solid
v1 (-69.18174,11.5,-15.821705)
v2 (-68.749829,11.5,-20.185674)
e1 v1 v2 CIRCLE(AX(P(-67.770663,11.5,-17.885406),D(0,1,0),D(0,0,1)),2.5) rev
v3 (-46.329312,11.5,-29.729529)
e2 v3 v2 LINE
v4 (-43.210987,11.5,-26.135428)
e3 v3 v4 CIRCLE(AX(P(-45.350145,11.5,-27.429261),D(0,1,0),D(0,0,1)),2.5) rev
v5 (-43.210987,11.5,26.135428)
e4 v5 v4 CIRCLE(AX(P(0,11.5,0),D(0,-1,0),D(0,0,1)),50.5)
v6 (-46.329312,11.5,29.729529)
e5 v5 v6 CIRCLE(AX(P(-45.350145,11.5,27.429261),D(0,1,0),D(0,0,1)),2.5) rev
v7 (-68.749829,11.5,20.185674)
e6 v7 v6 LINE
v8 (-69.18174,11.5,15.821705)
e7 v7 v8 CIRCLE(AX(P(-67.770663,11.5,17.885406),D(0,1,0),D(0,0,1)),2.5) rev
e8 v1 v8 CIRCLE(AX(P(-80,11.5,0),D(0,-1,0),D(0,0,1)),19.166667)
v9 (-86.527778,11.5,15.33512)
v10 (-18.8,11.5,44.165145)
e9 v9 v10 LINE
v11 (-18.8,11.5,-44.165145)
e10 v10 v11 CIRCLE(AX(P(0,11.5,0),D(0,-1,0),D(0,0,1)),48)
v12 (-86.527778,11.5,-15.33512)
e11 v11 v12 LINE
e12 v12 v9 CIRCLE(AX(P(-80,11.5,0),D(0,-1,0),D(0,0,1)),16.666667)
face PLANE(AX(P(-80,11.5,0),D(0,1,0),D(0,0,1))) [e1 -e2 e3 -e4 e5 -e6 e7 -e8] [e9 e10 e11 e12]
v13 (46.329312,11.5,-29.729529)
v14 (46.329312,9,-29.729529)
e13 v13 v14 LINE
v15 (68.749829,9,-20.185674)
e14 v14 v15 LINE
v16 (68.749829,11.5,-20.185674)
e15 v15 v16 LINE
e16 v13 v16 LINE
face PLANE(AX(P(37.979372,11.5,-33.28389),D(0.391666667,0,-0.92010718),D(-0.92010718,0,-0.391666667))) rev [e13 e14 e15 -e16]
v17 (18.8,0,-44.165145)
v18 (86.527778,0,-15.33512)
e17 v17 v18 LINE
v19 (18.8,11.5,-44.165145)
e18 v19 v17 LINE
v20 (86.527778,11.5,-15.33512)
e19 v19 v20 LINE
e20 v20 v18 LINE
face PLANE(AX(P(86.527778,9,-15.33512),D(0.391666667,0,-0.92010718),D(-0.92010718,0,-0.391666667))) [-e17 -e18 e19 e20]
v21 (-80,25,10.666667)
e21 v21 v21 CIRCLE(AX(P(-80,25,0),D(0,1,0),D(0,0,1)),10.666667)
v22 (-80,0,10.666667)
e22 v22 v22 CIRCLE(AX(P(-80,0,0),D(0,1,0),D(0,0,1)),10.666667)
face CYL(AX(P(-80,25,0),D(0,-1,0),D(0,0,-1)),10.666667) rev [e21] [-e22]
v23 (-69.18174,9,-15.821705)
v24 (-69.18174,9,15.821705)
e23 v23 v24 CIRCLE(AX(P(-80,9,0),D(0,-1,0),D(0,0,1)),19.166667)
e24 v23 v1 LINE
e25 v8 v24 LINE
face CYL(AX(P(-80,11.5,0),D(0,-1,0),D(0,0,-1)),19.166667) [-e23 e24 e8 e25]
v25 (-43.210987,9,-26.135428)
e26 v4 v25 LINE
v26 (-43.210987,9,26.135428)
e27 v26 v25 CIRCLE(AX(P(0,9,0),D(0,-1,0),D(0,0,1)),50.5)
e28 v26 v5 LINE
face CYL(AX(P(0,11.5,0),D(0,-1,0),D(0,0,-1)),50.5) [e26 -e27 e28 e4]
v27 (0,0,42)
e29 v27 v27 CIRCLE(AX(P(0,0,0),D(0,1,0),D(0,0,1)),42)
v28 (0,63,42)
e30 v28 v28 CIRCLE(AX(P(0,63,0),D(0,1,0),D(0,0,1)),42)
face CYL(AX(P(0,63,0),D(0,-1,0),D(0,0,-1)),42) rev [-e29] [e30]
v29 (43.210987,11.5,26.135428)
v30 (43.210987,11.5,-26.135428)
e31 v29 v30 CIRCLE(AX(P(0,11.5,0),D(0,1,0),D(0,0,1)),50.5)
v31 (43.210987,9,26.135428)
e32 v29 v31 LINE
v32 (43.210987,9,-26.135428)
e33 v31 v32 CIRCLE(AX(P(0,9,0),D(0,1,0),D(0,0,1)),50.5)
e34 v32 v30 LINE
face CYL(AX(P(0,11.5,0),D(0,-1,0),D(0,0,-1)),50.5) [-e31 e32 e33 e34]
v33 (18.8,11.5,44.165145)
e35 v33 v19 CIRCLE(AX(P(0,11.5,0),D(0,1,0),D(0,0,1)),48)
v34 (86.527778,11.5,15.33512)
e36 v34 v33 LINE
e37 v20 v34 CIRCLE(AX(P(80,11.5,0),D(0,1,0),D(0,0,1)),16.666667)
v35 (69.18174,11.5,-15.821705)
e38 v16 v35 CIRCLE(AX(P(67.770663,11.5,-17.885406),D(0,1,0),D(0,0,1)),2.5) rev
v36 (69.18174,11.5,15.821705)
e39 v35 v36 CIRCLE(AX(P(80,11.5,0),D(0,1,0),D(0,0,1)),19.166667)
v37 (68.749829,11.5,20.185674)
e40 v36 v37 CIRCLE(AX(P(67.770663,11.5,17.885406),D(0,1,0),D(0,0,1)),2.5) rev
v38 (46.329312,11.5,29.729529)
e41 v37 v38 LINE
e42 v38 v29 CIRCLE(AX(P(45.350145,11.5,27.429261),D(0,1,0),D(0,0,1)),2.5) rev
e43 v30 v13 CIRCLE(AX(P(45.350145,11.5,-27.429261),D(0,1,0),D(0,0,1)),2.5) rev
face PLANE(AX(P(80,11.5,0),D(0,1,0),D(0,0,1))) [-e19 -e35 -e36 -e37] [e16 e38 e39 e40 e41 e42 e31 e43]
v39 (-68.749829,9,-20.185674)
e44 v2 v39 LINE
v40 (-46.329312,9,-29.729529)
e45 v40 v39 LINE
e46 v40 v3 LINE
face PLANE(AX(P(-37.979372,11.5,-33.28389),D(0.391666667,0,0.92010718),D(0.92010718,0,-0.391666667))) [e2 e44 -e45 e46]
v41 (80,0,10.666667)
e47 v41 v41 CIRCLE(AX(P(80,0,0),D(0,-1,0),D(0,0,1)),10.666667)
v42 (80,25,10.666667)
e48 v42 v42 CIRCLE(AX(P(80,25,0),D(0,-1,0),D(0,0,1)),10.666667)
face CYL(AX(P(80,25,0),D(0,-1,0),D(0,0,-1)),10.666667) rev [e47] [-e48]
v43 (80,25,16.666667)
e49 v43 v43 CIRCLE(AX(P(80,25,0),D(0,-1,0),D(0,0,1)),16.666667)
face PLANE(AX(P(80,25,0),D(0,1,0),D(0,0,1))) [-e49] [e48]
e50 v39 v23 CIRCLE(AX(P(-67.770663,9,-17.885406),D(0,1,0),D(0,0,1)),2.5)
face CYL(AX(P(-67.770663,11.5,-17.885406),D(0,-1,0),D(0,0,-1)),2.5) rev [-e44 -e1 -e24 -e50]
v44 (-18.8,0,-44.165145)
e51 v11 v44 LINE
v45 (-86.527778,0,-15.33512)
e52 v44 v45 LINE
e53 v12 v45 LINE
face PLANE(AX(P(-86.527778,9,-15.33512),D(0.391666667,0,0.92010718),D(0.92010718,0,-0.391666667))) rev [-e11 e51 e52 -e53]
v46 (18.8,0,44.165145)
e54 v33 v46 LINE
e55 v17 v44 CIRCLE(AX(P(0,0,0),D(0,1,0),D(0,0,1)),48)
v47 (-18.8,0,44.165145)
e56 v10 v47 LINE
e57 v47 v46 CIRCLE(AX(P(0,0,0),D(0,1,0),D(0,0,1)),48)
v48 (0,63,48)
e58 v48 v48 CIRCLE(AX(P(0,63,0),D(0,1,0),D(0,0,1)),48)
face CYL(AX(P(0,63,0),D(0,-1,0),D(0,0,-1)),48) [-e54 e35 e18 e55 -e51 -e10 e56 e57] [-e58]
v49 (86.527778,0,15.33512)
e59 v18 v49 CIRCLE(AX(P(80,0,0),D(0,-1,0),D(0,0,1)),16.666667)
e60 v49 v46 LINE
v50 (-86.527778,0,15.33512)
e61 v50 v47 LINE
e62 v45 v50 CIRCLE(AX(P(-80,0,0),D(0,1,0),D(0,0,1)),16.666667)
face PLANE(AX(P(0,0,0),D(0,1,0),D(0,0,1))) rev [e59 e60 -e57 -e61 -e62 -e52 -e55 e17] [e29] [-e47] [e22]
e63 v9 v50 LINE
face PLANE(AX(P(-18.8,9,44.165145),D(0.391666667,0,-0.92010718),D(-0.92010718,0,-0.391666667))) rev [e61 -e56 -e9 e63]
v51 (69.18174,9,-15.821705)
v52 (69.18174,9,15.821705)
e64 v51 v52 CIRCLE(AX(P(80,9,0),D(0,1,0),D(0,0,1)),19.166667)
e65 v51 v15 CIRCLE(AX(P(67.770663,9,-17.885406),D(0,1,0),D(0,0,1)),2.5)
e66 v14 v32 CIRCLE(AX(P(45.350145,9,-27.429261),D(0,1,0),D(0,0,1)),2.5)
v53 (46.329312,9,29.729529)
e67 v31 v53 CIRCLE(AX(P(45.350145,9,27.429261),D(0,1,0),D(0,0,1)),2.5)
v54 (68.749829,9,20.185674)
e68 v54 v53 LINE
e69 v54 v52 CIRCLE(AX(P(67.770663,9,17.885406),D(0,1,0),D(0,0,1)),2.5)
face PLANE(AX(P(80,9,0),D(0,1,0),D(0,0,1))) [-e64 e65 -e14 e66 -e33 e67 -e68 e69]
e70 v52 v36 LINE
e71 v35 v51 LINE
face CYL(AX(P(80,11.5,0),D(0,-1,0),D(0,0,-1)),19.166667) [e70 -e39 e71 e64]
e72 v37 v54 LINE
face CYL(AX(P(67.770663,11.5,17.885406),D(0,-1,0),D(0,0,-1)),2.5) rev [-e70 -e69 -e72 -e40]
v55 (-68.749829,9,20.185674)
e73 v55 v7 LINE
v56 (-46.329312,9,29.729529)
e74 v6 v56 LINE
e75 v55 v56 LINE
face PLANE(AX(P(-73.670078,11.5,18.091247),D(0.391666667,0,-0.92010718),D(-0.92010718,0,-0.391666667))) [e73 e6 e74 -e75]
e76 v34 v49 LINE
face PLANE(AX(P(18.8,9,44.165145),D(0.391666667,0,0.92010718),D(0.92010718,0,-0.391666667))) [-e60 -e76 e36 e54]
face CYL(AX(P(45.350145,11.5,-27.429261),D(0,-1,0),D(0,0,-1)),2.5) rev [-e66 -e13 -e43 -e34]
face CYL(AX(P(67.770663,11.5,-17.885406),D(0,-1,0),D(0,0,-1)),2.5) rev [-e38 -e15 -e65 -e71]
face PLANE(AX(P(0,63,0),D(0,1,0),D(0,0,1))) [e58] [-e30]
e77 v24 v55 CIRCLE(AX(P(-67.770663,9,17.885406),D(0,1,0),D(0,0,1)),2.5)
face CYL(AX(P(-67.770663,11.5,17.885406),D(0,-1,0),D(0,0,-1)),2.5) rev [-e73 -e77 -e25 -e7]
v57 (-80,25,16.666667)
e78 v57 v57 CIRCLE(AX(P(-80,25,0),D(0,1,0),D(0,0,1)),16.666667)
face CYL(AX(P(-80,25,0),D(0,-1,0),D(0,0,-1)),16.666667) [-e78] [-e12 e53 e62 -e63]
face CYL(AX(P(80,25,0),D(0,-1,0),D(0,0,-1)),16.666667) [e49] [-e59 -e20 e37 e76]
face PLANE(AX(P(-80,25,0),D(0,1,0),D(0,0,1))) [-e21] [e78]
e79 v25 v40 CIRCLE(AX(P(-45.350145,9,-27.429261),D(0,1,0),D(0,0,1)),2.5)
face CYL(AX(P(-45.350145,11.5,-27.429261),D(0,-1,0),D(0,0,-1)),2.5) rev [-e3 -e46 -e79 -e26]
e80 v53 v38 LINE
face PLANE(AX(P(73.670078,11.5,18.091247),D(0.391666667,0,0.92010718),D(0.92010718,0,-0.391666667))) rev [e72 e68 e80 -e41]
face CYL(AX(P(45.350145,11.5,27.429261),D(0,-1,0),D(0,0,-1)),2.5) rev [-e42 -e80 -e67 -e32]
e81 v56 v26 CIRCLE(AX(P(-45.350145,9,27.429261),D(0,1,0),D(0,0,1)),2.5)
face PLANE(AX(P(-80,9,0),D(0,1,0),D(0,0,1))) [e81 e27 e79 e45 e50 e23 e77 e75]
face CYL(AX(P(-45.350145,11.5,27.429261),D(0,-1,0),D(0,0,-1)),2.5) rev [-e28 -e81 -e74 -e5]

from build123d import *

# Parameters (mm, degrees)
SKETCH1_R           = 48
SKETCH1_R_2         = 42
BOSS_EXTRUDE1_DEPTH = 63
SKETCH2_R           = 16.666666667
SKETCH2_R_2         = 10.666666667
BOSS_EXTRUDE2_DEPTH = 25
BOSS_EXTRUDE3_DEPTH = 9
BOSS_EXTRUDE4_DEPTH = 2.5
FILLET1_R           = 2.5
MIRROR3_DEPTH       = 9
MIRROR3_START       = 9
MIRROR3_2_DEPTH     = 2.5


# Read off the part's stored shape, not the designer's step: Mirror3
with BuildPart() as part:
    # Sketch1 → Boss-Extrude1 (new body)
    with BuildSketch(Plane(origin=(0, 0, 0), x_dir=(1, 0, 0), z_dir=(0, 1, 0))):
        with Locations(Location((0, 0, 0), (0, 0, 270))):
            Circle(SKETCH1_R)
        with Locations(Location((0, 0, 0), (0, 0, 270))):
            Circle(SKETCH1_R_2, mode=Mode.SUBTRACT)
    extrude(amount=BOSS_EXTRUDE1_DEPTH)



with BuildPart() as body_2:
    # Sketch2 → Boss-Extrude2 (new body)
    with BuildSketch(Plane(origin=(0, 0, 0), x_dir=(1, 0, 0), z_dir=(0, 1, 0))):
        with Locations(Location((-80, 0, 0), (0, 0, 270))):
            Circle(SKETCH2_R)
        with Locations(Location((-80, 0, 0), (0, 0, 270))):
            Circle(SKETCH2_R_2, mode=Mode.SUBTRACT)
    boss_extrude2 = extrude(amount=BOSS_EXTRUDE2_DEPTH)


with BuildPart() as part_1:
    add(part.part)

    add(body_2.part)  # Boss-Extrude3 merges body 2
    # Sketch3 → Boss-Extrude3 (add)
    with BuildSketch(Plane(origin=(0, 0, 0), x_dir=(1, 0, 0), z_dir=(0, 1, 0))):
        with BuildLine():
            Line((-86.527777778, 15.335119662), (-18.8, 44.165144628))
            ThreePointArc((-18.8, 44.165144628), (-48, 0), (-18.8, -44.165144628))
            Line((-18.8, -44.165144628), (-86.527777778, -15.335119662))
            ThreePointArc((-86.527777778, -15.335119662), (-63.333333333, 0), (-86.527777778, 15.335119662))
        make_face()
    extrude(amount=BOSS_EXTRUDE3_DEPTH)

    # Sketch5 → Boss-Extrude4 (add)
    with BuildSketch(Plane(origin=(0, 9, 0), x_dir=(1, 0, 0), z_dir=(0, 1, 0))):
        with BuildLine():
            Line((-86.527777778, -15.335119662), (-18.8, -44.165144628))
            ThreePointArc((-18.8, -44.165144628), (-48, 0), (-18.8, 44.165144628))
            Line((-18.8, 44.165144628), (-86.527777778, 15.335119662))
            ThreePointArc((-86.527777778, 15.335119662), (-63.333333333, 0), (-86.527777778, -15.335119662))
        make_face()
        with BuildLine():
            Line((-37.97937164, 33.283889944), (-73.670078498, 18.091246637))
            ThreePointArc((-73.670078498, 18.091246637), (-60.833333333, 0), (-73.670078498, -18.091246637))
            Line((-73.670078498, -18.091246637), (-37.97937164, -33.283889944))
            ThreePointArc((-37.97937164, -33.283889944), (-50.5, 0), (-37.97937164, 33.283889944))
        make_face(mode=Mode.SUBTRACT)
    extrude(amount=BOSS_EXTRUDE4_DEPTH)

    # Fillet1
    fillet1_edges = [part_1.edges().sort_by_distance(p)[0] for p in [
        (-37.97937164, 10.25, -33.283889944),
        (-73.670078498, 10.25, -18.091246637),
        (-73.670078498, 10.25, 18.091246637),
        (-37.97937164, 10.25, 33.283889944),
    ]]
    fillet(fillet1_edges, radius=FILLET1_R)

    # Mirror3 outline → Mirror3 (add)
    with BuildSketch(Plane(origin=(0, 0, 0), x_dir=(1, 0, 0), z_dir=(0, 1, 0))):
        with BuildLine():
            Line((18.8, -44.165144628), (86.527777778, -15.335119662))
            ThreePointArc((86.527777778, -15.335119662), (63.333333333, 0), (86.527777778, 15.335119662))
            Line((86.527777778, 15.335119662), (18.8, 44.165144628))
            ThreePointArc((18.8, 44.165144628), (48, 0), (18.8, -44.165144628))
        make_face()
    extrude(amount=MIRROR3_DEPTH)

    # Mirror3 2 outline → Mirror3 2 (add)
    with BuildSketch(Plane(origin=(0, 0, 0), x_dir=(1, 0, 0), z_dir=(0, 1, 0)).offset(MIRROR3_START)):
        with BuildLine():
            Line((18.8, -44.165144628), (86.527777778, -15.335119662))
            ThreePointArc((86.527777778, -15.335119662), (63.333333333, 0), (86.527777778, 15.335119662))
            Line((86.527777778, 15.335119662), (18.8, 44.165144628))
            ThreePointArc((18.8, 44.165144628), (48, 0), (18.8, -44.165144628))
        make_face()
        with BuildLine():
            ThreePointArc((43.210987158, -26.135427849), (50.5, 0), (43.210987158, 26.135427849))
            ThreePointArc((43.210987158, 26.135427849), (43.461816214, 29.067618208), (46.329311604, 29.72952886))
            Line((46.329311604, 29.72952886), (68.749829189, 20.185673992))
            ThreePointArc((68.749829189, 20.185673992), (70.258507425, 18.131633045), (69.181739923, 15.821705345))
            ThreePointArc((69.181739923, 15.821705345), (60.833333333, 0), (69.181739923, -15.821705345))
            ThreePointArc((69.181739923, -15.821705345), (70.258507425, -18.131633045), (68.749829189, -20.185673992))
            Line((68.749829189, -20.185673992), (46.329311604, -29.72952886))
            ThreePointArc((46.329311604, -29.72952886), (43.461816214, -29.067618208), (43.210987158, -26.135427849))
        make_face(mode=Mode.SUBTRACT)
    extrude(amount=MIRROR3_2_DEPTH)

    # Mirror4: Boss-Extrude2 across plane
    add(boss_extrude2.mirror(Plane(origin=(0, 0, 0), x_dir=(0, 0, 1), z_dir=(1, 0, 0))))


solid = part_1.part
